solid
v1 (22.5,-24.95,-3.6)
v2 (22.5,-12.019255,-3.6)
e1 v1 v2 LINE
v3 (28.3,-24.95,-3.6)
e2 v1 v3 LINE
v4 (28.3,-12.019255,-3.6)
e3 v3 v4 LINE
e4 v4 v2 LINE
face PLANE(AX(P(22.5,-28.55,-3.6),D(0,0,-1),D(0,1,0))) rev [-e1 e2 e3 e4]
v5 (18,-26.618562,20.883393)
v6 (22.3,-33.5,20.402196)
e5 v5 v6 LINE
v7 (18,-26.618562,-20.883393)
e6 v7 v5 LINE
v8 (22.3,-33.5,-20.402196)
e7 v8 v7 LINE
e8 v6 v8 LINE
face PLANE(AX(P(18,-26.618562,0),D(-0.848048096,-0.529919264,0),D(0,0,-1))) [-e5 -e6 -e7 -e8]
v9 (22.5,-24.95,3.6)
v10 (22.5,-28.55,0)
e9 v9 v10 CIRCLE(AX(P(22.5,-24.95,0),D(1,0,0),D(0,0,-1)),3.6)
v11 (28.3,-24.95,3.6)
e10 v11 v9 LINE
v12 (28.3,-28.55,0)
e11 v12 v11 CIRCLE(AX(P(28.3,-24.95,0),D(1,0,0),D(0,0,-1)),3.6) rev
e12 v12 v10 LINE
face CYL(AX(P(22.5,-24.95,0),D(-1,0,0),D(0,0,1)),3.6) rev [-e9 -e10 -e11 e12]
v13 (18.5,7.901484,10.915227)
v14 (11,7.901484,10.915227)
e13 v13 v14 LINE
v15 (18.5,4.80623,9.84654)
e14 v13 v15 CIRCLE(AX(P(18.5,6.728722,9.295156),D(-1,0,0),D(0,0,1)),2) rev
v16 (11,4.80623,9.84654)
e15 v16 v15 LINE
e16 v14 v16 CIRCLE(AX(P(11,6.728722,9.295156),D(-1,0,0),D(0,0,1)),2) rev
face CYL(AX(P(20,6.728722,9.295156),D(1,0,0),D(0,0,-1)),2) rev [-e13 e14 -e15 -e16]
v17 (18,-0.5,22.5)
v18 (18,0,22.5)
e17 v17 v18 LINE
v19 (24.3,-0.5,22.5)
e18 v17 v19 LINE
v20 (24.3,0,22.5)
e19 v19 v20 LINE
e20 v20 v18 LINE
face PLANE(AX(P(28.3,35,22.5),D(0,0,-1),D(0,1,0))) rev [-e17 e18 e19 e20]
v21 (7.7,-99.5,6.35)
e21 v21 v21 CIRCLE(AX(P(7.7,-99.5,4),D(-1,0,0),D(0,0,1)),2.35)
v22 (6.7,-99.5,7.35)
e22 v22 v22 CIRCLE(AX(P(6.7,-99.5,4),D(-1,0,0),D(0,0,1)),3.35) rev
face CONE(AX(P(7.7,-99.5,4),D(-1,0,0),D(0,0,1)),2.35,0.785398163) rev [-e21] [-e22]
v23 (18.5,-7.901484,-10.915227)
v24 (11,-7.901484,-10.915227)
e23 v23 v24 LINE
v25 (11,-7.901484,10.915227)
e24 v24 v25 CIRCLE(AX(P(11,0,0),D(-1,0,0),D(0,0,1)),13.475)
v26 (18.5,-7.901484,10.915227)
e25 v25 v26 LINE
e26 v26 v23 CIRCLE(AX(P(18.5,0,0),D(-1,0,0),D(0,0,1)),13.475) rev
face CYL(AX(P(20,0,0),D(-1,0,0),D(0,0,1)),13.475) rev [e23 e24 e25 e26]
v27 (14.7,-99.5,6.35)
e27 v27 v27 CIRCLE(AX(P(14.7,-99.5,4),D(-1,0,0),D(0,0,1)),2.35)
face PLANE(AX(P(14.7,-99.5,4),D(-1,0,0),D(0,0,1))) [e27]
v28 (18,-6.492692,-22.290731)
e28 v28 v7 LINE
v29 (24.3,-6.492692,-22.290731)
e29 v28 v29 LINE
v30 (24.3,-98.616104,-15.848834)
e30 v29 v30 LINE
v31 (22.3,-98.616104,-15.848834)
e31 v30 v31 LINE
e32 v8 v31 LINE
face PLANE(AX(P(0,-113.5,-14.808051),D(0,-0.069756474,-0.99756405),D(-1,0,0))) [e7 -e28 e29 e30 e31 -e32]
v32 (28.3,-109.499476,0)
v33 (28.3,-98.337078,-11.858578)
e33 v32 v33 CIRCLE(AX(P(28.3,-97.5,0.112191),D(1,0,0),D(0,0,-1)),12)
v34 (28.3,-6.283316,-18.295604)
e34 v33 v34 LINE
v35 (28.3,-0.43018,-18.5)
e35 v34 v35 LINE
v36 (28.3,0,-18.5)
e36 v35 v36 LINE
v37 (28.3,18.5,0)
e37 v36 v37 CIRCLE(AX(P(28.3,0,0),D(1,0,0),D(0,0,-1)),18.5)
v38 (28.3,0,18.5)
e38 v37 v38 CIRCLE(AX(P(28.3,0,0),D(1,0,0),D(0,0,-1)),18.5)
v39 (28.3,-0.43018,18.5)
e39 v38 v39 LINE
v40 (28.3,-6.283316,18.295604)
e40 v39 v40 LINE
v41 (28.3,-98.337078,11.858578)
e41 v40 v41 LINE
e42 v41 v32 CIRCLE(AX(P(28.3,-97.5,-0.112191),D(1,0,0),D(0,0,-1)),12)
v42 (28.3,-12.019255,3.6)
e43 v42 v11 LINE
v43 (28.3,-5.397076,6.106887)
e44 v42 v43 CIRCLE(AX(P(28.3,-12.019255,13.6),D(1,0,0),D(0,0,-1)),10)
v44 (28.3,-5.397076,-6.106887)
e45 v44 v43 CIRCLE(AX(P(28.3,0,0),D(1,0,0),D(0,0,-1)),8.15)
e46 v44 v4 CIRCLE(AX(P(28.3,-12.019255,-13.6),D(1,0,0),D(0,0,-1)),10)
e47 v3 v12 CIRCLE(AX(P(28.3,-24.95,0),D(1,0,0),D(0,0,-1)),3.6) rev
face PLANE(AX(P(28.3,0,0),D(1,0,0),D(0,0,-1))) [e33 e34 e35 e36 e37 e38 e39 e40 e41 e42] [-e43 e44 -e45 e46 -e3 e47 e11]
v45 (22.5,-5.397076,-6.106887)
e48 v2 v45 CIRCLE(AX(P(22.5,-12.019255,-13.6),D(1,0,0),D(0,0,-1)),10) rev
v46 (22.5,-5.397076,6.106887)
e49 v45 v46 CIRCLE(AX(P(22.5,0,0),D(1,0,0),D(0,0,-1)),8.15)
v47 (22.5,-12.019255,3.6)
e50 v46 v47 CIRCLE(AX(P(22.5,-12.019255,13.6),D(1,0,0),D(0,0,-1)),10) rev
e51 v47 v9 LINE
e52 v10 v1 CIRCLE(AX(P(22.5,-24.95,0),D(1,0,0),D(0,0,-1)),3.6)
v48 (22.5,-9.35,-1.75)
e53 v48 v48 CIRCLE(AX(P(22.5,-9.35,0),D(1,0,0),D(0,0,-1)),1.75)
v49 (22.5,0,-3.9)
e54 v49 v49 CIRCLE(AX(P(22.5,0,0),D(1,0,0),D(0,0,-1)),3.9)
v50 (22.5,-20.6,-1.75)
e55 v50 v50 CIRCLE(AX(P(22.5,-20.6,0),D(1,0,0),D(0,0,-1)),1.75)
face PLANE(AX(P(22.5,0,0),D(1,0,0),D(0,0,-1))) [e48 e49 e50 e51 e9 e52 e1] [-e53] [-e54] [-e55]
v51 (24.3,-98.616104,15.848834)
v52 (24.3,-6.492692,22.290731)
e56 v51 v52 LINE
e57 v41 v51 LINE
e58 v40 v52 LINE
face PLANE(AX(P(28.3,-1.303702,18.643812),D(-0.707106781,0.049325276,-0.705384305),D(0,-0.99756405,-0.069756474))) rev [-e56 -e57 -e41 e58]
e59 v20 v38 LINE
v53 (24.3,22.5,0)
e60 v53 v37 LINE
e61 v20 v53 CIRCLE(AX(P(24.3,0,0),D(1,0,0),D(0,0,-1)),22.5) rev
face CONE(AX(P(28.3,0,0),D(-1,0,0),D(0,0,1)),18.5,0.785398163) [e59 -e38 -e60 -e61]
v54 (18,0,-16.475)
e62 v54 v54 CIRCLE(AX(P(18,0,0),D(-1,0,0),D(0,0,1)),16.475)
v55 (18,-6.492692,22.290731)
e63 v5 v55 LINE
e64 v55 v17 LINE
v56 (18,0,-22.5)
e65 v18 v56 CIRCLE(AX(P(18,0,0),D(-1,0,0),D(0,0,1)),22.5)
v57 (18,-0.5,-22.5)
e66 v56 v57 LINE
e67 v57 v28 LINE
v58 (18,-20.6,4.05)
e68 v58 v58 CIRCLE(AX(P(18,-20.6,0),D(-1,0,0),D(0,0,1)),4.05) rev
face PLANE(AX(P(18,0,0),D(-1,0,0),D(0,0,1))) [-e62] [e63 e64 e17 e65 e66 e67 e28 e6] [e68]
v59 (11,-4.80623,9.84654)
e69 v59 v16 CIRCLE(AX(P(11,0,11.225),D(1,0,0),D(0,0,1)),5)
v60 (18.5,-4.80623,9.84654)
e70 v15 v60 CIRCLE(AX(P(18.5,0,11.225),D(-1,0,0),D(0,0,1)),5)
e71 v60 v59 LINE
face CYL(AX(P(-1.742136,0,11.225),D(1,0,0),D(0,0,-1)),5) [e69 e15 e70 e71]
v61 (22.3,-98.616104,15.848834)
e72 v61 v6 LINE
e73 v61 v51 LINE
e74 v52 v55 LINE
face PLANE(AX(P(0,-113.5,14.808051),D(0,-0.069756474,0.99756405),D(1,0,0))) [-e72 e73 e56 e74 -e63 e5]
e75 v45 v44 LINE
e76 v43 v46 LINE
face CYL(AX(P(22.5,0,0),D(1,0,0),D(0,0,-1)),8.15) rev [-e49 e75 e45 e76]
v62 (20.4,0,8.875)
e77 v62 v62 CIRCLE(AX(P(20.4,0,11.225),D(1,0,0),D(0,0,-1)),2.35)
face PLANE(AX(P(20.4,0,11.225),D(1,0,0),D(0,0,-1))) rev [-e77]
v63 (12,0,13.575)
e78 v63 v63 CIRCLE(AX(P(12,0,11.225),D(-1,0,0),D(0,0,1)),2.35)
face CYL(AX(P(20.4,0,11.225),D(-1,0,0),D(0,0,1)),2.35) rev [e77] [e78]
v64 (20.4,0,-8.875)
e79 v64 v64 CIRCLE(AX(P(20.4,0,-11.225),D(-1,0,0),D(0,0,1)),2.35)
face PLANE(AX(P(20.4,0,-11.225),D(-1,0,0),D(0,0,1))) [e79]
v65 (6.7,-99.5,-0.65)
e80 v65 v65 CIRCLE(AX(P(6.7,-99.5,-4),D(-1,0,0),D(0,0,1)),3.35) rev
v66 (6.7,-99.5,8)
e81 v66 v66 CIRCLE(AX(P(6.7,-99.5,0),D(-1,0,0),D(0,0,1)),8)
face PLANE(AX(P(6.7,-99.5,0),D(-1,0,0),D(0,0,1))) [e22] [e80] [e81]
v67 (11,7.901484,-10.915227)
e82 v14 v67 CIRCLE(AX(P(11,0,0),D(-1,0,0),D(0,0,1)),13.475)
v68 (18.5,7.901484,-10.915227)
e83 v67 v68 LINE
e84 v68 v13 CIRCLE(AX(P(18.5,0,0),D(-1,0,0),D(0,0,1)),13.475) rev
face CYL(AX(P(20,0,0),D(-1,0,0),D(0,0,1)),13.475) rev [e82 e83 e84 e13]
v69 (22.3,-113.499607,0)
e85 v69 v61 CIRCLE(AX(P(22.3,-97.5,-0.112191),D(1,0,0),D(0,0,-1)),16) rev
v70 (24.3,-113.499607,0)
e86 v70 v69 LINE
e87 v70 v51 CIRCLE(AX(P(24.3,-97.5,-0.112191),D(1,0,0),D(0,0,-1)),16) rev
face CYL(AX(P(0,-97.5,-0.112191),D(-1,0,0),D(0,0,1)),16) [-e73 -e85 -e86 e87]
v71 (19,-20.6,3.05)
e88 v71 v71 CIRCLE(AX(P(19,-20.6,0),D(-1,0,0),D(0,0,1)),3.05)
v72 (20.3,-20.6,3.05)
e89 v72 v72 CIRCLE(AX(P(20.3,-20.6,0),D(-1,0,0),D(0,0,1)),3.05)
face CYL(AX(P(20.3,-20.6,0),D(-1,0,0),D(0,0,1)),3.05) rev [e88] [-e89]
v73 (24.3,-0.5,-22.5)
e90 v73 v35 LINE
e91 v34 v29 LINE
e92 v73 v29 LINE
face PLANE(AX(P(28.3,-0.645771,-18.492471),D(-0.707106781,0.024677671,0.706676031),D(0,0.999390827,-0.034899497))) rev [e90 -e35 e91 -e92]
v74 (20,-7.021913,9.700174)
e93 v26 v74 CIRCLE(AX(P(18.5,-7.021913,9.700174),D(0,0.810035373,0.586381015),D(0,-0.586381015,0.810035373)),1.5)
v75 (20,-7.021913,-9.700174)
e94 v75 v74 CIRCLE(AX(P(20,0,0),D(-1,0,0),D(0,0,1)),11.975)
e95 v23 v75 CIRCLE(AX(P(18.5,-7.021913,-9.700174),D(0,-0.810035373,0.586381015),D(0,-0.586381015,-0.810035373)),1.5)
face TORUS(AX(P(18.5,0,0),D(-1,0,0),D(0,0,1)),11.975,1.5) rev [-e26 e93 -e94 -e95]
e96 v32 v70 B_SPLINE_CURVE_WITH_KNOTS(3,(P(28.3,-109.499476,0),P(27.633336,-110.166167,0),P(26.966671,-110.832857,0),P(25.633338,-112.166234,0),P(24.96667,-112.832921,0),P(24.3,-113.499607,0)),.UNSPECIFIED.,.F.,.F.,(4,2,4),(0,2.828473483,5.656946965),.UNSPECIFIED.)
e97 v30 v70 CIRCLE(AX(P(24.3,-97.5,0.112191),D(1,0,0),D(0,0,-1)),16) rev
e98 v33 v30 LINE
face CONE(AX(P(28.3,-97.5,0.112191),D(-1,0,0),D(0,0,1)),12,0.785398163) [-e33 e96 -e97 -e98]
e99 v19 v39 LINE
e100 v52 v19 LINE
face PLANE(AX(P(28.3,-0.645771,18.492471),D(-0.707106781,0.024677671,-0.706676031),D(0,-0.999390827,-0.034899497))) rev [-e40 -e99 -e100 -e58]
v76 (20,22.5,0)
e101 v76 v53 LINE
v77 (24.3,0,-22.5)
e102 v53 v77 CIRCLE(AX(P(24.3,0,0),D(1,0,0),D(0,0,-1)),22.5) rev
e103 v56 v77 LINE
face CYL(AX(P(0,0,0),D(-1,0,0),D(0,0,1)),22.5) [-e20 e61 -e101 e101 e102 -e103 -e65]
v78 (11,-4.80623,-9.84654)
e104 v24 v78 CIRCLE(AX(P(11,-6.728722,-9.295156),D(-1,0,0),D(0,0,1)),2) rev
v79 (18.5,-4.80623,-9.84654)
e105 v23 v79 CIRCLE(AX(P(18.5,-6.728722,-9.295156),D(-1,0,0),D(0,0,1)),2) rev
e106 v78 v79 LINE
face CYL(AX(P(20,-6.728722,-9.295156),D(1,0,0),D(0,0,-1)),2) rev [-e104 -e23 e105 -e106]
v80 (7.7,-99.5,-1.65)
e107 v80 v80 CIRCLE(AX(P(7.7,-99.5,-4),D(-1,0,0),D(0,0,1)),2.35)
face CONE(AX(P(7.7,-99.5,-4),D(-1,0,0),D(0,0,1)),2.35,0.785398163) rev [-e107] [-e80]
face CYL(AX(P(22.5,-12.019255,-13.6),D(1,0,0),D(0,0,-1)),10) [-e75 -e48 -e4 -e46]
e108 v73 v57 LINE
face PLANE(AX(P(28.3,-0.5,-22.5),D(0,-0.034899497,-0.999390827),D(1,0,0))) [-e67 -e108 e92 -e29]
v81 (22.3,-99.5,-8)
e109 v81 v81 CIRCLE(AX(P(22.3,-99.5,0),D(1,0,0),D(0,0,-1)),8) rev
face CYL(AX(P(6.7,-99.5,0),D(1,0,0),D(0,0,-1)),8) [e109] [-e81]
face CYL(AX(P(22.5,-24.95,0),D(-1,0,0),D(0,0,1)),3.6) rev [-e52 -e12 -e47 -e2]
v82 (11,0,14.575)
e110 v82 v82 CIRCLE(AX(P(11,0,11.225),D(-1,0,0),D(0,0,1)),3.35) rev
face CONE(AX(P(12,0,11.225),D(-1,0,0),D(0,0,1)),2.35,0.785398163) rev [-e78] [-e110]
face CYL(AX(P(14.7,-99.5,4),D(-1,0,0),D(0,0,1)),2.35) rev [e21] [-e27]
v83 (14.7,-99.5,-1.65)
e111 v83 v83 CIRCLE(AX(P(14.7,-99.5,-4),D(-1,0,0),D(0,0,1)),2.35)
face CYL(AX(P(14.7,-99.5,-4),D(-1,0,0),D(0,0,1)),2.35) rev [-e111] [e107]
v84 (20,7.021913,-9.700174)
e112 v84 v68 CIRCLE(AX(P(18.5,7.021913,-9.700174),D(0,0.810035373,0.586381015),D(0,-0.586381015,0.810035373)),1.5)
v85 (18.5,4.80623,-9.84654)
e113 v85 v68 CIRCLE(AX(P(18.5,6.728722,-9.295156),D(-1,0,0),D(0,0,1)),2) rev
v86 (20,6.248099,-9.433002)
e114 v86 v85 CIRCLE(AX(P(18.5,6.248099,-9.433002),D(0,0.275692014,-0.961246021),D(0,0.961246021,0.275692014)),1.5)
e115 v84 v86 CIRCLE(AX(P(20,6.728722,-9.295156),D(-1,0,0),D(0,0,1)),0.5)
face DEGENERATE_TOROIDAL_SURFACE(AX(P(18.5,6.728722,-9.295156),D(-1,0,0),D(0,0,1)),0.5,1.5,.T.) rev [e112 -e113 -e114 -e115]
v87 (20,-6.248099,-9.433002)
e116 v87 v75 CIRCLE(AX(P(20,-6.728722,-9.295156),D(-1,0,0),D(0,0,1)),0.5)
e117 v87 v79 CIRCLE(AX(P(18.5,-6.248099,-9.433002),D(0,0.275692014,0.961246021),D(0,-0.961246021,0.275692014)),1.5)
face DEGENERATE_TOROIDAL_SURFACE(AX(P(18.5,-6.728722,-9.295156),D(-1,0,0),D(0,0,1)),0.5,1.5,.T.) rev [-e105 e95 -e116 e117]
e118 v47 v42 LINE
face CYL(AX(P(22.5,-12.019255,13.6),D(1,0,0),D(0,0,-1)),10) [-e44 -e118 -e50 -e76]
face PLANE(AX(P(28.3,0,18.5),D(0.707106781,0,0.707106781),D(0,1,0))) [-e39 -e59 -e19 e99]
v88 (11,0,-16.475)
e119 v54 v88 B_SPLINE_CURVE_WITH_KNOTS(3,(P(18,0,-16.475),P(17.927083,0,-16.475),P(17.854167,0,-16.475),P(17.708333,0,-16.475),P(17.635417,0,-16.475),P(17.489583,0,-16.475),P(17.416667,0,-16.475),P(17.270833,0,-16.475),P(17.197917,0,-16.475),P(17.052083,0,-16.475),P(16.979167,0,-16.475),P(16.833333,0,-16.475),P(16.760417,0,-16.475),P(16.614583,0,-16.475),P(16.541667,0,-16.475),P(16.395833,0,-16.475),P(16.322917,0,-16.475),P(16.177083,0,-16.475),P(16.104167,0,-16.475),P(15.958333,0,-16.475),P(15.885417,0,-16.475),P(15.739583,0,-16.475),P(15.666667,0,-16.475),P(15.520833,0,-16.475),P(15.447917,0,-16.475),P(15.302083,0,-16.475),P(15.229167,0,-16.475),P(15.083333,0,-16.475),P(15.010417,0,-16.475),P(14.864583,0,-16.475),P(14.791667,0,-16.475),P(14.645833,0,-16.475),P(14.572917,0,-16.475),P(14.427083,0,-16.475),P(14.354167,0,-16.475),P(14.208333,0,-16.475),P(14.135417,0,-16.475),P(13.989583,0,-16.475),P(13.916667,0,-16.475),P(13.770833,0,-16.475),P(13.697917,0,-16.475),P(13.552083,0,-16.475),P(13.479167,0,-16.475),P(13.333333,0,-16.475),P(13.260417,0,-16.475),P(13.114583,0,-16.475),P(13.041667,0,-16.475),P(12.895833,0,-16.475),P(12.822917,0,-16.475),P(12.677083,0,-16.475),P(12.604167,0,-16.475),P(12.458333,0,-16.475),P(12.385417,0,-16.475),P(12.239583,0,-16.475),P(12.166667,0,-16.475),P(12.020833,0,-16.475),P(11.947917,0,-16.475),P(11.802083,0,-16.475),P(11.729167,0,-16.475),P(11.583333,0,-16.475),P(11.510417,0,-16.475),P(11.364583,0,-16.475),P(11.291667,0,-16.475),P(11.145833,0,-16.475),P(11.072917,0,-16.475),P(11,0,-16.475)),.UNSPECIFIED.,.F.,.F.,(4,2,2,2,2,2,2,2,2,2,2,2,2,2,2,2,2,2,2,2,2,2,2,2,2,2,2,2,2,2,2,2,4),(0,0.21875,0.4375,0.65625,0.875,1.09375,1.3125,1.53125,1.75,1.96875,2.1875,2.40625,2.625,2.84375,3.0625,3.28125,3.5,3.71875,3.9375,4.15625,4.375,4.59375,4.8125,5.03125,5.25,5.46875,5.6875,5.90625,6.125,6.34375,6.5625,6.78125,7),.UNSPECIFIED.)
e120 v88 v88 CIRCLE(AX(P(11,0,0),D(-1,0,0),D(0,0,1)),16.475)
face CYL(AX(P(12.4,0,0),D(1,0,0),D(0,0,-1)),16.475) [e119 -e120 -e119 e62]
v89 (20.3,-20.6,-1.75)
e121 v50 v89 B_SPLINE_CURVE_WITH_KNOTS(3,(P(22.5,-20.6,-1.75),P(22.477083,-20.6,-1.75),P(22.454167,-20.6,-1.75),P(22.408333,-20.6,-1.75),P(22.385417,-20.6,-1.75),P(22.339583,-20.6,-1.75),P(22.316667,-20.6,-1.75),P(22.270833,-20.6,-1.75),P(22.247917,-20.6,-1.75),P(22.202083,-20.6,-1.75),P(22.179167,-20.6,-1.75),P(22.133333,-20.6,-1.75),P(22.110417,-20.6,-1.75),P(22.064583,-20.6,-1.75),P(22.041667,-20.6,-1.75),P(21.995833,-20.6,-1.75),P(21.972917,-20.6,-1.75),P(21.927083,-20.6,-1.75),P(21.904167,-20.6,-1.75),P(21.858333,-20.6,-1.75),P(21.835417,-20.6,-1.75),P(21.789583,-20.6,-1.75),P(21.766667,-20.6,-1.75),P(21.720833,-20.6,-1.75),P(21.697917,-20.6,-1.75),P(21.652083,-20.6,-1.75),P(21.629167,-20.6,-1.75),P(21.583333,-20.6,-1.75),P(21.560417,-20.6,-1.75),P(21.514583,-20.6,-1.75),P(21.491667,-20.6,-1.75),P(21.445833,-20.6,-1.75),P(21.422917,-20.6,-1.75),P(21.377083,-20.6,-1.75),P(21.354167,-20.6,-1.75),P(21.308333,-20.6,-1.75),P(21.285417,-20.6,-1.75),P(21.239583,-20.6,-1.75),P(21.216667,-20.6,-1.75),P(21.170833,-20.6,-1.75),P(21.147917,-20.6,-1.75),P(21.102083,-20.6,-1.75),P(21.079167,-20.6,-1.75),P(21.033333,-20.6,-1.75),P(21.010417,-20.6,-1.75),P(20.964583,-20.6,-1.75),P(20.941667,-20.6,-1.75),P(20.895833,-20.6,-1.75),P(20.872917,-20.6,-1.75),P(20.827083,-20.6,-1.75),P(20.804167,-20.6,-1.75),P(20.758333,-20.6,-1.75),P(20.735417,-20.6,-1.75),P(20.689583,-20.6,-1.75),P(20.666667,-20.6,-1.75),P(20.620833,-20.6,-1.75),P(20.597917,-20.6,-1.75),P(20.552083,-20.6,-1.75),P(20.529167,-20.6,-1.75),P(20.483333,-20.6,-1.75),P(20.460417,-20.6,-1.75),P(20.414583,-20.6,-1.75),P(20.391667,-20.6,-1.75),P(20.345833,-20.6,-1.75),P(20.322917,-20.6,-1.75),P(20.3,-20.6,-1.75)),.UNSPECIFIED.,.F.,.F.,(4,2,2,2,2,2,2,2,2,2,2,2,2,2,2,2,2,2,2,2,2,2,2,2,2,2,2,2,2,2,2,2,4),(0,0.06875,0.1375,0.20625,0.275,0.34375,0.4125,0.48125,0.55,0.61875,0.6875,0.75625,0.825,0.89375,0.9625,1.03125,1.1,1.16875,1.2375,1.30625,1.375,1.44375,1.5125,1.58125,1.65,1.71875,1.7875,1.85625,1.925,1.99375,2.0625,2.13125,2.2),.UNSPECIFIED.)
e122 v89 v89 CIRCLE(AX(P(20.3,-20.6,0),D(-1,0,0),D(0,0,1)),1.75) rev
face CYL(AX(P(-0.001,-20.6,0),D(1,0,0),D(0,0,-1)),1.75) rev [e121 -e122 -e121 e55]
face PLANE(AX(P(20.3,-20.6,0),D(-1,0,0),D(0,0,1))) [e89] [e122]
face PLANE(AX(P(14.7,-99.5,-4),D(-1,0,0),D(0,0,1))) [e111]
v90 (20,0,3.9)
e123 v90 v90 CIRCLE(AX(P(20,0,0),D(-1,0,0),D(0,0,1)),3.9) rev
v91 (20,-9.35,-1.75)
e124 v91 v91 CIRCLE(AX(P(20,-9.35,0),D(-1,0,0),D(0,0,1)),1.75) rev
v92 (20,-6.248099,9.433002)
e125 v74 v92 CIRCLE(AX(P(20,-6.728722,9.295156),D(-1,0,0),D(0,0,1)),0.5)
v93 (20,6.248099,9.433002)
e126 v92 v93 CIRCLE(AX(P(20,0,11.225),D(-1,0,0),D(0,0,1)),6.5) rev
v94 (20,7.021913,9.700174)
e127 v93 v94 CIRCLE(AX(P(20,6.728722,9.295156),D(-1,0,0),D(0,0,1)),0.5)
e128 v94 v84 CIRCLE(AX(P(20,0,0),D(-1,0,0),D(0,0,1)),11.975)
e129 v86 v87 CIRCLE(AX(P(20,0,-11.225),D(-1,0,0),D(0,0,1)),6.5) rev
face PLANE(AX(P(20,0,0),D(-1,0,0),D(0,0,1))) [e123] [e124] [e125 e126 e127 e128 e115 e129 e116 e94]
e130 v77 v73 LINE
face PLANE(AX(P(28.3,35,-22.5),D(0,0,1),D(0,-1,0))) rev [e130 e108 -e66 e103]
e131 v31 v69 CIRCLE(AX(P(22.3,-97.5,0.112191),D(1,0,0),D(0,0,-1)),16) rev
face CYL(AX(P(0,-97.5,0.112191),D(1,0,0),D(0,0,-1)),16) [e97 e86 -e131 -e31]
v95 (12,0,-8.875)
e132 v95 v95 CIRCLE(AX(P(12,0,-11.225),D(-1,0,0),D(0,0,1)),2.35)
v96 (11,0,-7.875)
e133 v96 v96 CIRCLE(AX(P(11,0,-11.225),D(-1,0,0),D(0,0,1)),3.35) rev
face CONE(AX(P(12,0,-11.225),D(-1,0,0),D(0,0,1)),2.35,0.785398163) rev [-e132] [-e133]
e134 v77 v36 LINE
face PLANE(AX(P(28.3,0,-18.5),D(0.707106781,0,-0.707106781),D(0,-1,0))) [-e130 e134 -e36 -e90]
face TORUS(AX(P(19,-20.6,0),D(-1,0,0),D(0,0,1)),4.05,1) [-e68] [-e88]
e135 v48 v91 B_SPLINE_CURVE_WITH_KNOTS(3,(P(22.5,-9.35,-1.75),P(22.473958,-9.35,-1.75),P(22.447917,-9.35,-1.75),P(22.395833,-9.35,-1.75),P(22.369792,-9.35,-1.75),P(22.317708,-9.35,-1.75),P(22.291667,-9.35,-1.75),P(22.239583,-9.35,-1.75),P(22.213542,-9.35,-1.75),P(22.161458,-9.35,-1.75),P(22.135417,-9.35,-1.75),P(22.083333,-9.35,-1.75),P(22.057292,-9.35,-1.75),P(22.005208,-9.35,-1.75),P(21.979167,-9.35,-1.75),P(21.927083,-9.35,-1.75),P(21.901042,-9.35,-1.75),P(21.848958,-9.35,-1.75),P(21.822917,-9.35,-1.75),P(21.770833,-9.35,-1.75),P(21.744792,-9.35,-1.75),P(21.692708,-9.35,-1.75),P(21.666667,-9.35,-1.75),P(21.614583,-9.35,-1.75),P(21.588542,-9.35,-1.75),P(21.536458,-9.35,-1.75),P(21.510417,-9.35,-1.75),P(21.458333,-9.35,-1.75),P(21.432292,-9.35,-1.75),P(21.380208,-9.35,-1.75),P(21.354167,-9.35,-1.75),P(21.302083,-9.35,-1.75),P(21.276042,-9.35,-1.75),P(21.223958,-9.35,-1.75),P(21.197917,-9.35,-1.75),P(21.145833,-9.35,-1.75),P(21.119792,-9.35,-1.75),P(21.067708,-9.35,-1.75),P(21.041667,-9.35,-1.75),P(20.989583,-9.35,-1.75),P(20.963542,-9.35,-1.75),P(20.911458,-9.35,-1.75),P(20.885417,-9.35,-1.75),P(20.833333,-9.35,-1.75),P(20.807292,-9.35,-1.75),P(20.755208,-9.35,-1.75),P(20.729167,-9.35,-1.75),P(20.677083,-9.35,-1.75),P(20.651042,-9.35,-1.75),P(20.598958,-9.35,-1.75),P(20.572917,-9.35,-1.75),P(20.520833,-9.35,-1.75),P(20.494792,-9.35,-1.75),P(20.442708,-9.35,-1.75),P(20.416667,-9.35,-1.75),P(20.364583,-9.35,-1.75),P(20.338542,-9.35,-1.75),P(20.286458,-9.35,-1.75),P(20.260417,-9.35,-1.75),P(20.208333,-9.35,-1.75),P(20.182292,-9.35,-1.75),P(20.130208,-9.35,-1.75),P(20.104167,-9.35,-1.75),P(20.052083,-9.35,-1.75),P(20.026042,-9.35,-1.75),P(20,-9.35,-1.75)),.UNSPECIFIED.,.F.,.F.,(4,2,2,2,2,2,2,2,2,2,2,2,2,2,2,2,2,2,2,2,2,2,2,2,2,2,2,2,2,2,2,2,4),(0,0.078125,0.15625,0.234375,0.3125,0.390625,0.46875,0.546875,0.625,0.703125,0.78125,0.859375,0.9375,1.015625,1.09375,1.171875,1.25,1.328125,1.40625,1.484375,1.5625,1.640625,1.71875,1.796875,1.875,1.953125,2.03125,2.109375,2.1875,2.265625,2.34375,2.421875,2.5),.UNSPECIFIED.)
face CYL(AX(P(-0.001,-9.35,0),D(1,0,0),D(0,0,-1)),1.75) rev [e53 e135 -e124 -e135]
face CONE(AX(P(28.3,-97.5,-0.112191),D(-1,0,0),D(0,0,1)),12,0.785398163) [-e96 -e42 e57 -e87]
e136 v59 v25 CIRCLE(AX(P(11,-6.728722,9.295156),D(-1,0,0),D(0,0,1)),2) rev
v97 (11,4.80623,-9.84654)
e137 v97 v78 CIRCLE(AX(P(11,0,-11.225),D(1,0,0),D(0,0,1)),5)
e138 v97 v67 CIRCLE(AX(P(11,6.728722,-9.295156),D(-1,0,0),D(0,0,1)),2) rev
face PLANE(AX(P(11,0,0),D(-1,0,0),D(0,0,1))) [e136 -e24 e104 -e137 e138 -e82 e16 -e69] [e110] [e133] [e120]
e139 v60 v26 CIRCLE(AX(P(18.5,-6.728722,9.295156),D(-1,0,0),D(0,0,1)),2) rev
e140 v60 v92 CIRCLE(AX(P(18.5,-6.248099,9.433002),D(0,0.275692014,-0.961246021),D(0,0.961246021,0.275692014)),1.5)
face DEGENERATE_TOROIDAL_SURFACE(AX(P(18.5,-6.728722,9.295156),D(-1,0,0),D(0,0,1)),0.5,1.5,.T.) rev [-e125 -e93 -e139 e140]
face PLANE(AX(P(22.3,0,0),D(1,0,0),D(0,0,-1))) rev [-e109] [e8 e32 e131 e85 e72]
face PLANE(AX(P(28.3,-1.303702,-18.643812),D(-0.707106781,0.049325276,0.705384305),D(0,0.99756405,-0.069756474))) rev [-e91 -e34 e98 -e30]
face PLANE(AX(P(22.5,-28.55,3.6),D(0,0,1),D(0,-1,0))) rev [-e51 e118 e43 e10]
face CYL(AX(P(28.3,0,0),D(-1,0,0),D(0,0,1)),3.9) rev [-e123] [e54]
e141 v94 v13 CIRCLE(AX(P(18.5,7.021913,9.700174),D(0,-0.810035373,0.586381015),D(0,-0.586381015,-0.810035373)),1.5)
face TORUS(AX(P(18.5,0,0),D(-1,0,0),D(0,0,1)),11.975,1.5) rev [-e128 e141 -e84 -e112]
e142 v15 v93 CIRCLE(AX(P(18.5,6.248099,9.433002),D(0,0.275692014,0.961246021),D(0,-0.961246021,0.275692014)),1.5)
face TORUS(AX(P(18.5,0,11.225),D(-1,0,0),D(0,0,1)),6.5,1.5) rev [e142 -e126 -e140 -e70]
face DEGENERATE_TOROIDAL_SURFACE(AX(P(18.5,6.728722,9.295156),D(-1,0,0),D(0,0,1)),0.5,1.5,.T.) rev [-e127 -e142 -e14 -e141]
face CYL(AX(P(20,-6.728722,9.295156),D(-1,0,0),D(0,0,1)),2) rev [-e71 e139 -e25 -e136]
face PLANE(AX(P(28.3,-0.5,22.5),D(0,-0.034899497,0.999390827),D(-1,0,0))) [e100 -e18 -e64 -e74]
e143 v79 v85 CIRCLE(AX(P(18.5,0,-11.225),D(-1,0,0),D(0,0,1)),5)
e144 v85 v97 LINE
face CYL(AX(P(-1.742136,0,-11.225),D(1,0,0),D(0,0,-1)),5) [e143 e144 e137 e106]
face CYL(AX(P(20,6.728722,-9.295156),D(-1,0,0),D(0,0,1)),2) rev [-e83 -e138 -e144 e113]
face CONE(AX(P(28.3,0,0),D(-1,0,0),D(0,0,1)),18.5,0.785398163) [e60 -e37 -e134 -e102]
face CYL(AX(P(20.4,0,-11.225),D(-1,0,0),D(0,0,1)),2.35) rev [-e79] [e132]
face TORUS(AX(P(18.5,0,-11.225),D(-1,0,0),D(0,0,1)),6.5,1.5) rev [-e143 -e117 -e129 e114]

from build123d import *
from OCP.BRepFilletAPI import BRepFilletAPI_MakeChamfer

# Parameters (mm, degrees)
SKETCH1_W           = 20
SKETCH1_H           = 20
BOSS_EXTRUDE1_DEPTH = 20
SKETCH2_W           = 45
SKETCH2_H           = 70
BOSS_EXTRUDE2_DEPTH = 8.3
CUT_EXTRUDE1_DEPTH  = 5.8
FILLET1_R           = 3.6
FILLET2_R           = 10
SKETCH5_R           = 3.9
CUT_EXTRUDE2_DEPTH  = 51.320373608
CUT_EXTRUDE3_REACH  = 49.302
SKETCH6_R           = 1.75
SKETCH13_W          = 20
SKETCH13_H          = 20
CUT_EXTRUDE9_DEPTH  = 20
SKETCH14_R          = 16.475
BOSS_EXTRUDE3_DEPTH = 7.6
SKETCH15_W          = 8.3
SKETCH15_H          = 45
CUT_EXTRUDE10_DEPTH = 12.5
SKETCH16_R          = 13.475
CUT_EXTRUDE11_DEPTH = 7.6
SKETCH18_W          = 8.3
SKETCH18_H          = 45
BOSS_EXTRUDE4_DEPTH = 78.5
FILLET5_R           = 22.5
SKETCH20_W          = 45
SKETCH20_H          = 80
CUT_EXTRUDE12_DEPTH = 2.3
SKETCH21_R          = 8
BOSS_EXTRUDE5_DEPTH = 15.6
CHAMFER2_SIZE       = 110
CHAMFER2_SIZE2      = 7.691949314
CHAMFER3_SIZE       = 3
FILLET6_R           = 16
CHAMFER4_SIZE       = 4
SKETCH23_R          = 2.35
CUT_EXTRUDE13_DEPTH = 8
CHAMFER5_SIZE       = 1
SKETCH24_R          = 5
BOSS_EXTRUDE6_DEPTH = 7.6
SKETCH27_R          = 2.35
CUT_EXTRUDE14_DEPTH = 8
SKETCH28_R          = 16.475
SKETCH28_R_2        = 1.75
BOSS_EXTRUDE7_DEPTH = 2
BOSS_EXTRUDE8_START = 1.4
SKETCH30_R          = 16.475
SKETCH30_R_2        = 2.35
BOSS_EXTRUDE8_DEPTH = 1.4
FILLET7_R           = 2
FILLET8_R           = 1.5
CHAMFER6_SIZE       = 1
SKETCH31_R          = 3.05
CUT_EXTRUDE15_DEPTH = 2.3
FILLET9_R           = 1
CHAMFER7_SIZE2      = 4.3
CHAMFER7_SIZE       = 6.881438475


# Some blends are built 0.0001 mm under size
with BuildPart() as part:
    # Sketch1 → Boss-Extrude1 (new body)
    with BuildSketch(Plane(origin=(0, 0, 0), x_dir=(0, 0, -1), z_dir=(1, 0, 0))):
        Rectangle(SKETCH1_W, SKETCH1_H)
    extrude(amount=BOSS_EXTRUDE1_DEPTH)

    # Sketch2 → Boss-Extrude2 (add)
    with BuildSketch(Plane(origin=(20, 0, 0), x_dir=(0, 0, -1), z_dir=(1, 0, 0))):
        Rectangle(SKETCH2_W, SKETCH2_H)
    extrude(amount=BOSS_EXTRUDE2_DEPTH)

    # Sketch4 → Cut-Extrude1 (cut)
    with BuildSketch(Plane(origin=(28.3, 0, 0), x_dir=(0, 0, -1), z_dir=(1, 0, 0))):
        with BuildLine():
            Line((3.6, -28.55), (-3.6, -28.55))
            Line((-3.6, -28.55), (-3.6, -7.311805523))
            ThreePointArc((-3.6, -7.311805523), (0, 8.15), (3.6, -7.311805523))
            Line((3.6, -7.311805523), (3.6, -28.55))
        make_face()
    extrude(amount=-CUT_EXTRUDE1_DEPTH, mode=Mode.SUBTRACT)

    # Fillet1
    fillet1_edges = [part.edges().sort_by_distance(p)[0] for p in [
        (25.4, -28.55, 3.6),
        (25.4, -28.55, -3.6),
    ]]
    fillet(fillet1_edges, radius=FILLET1_R - 0.0001)  # a hair under: the kernel refuses the full size

    # Fillet2
    fillet2_edges = [part.edges().sort_by_distance(p)[0] for p in [
        (25.4, -7.311805523, 3.6),
        (25.4, -7.311805523, -3.6),
    ]]
    fillet(fillet2_edges, radius=FILLET2_R)

    # Sketch5 → Cut-Extrude2 (cut, through all)
    with BuildSketch(Plane.ZY):
        Circle(SKETCH5_R)
    extrude(amount=-CUT_EXTRUDE2_DEPTH, mode=Mode.SUBTRACT)

    # Sketch6 → Cut-Extrude3 (cut, up to next)
    with BuildSketch(Plane(origin=(22.5, 0, 0), x_dir=(0, 0, -1), z_dir=(1, 0, 0)), mode=Mode.PRIVATE) as cut_extrude3_sk1:
        with Locations((0, -20.6)):
            Circle(SKETCH6_R)
    cut_extrude3_tool1 = extrude(cut_extrude3_sk1.sketch, amount=-CUT_EXTRUDE3_REACH, mode=Mode.PRIVATE) & part.part
    # Sketch6 → Cut-Extrude3 (cut, up to next)
    with BuildSketch(Plane(origin=(22.5, 0, 0), x_dir=(0, 0, -1), z_dir=(1, 0, 0)), mode=Mode.PRIVATE) as cut_extrude3_sk2:
        with Locations((0, -9.35)):
            Circle(SKETCH6_R)
    cut_extrude3_tool2 = extrude(cut_extrude3_sk2.sketch, amount=-CUT_EXTRUDE3_REACH, mode=Mode.PRIVATE) & part.part
    add(cut_extrude3_tool1.solids().sort_by_distance((22.5, -20.6, 0))[0], mode=Mode.SUBTRACT)
    add(cut_extrude3_tool2.solids().sort_by_distance((22.5, -9.35, 0))[0], mode=Mode.SUBTRACT)

    # Sketch13 → Cut-Extrude9 (cut)
    with BuildSketch(Plane.ZY):
        Rectangle(SKETCH13_W, SKETCH13_H)
    extrude(amount=-CUT_EXTRUDE9_DEPTH, mode=Mode.SUBTRACT)

    # Sketch14 → Boss-Extrude3 (add)
    with BuildSketch(Plane.ZY.offset(-20)):
        with Locations(Location((0, 0, 0), (0, 0, 180))):
            Circle(SKETCH14_R)
    extrude(amount=BOSS_EXTRUDE3_DEPTH)

    # Sketch15 → Cut-Extrude10 (cut)
    with BuildSketch(Plane(origin=(0, 35, 0), x_dir=(1, 0, 0), z_dir=(0, 1, 0))):
        with Locations((24.15, 0)):
            Rectangle(SKETCH15_W, SKETCH15_H)
    extrude(amount=-CUT_EXTRUDE10_DEPTH, mode=Mode.SUBTRACT)

    # Sketch16 → Cut-Extrude11 (cut)
    with BuildSketch(Plane.ZY.offset(-12.4)):
        Circle(SKETCH16_R)
    extrude(amount=-CUT_EXTRUDE11_DEPTH, mode=Mode.SUBTRACT)

    # Sketch18 → Boss-Extrude4 (add)
    with BuildSketch(Plane.XZ.offset(35)):
        with Locations((24.15, 0)):
            Rectangle(SKETCH18_W, SKETCH18_H)
    extrude(amount=BOSS_EXTRUDE4_DEPTH)

    # Fillet5
    fillet5_edges = [part.edges().sort_by_distance(p)[0] for p in [
        (24.15, 22.5, -22.5),
        (24.15, 22.5, 22.5),
    ]]
    fillet(fillet5_edges, radius=FILLET5_R - 0.0001)  # a hair under: the kernel refuses the full size

    # Sketch20 → Cut-Extrude12 (cut)
    with BuildSketch(Plane.ZY.offset(-20)):
        with Locations((0, -73.5)):
            Rectangle(SKETCH20_W, SKETCH20_H)
    extrude(amount=-CUT_EXTRUDE12_DEPTH, mode=Mode.SUBTRACT)

    # Sketch21 → Boss-Extrude5 (add)
    with BuildSketch(Plane.ZY.offset(-22.3)):
        with Locations(Location((0, -99.5, 0), (0, 0, 180))):
            Circle(SKETCH21_R)
    extrude(amount=BOSS_EXTRUDE5_DEPTH)

    # Chamfer2: one chamfer whose edges measure the first distance from different faces: ONE call of the kernel's chamfer builder (chamfer() names one face for all edges)
    chamfer2_edges_1 = [part.edges().sort_by_distance(p)[0] for p in [
        (25.3, -113.5, -22.5),
    ]]
    chamfer2_side_1 = [part.faces().sort_by_distance(p)[0] for p in [
        (24.878183359, -52.68424744, -22.5),
    ]]
    chamfer2_edges_2 = [part.edges().sort_by_distance(p)[0] for p in [
        (25.3, -113.5, 22.5),
    ]]
    chamfer2_side_2 = [part.faces().sort_by_distance(p)[0] for p in [
        (24.878183359, -52.68424744, 22.5),
    ]]
    chamfer2 = BRepFilletAPI_MakeChamfer(part.part.solid().wrapped)
    for e in chamfer2_edges_1:
        chamfer2.Add(CHAMFER2_SIZE, CHAMFER2_SIZE2, e.wrapped, chamfer2_side_1[0].wrapped)  # the first distance lies on this face
    for e in chamfer2_edges_2:
        chamfer2.Add(CHAMFER2_SIZE, CHAMFER2_SIZE2, e.wrapped, chamfer2_side_2[0].wrapped)  # the first distance lies on this face
    add(Compound.cast(chamfer2.Shape()), mode=Mode.REPLACE)

    # Chamfer3
    # the kernel refuses this chamfer: 3 mm, written as the material it takes off along each edge
    with BuildSketch(Plane(origin=(36.099824275, -3.5, -22.5), x_dir=(0, -0.9976567869548854, 0.06841736214481542), z_dir=(-1, 0, 0))) as chamfer3_piece_1:
        Polygon((CHAMFER3_SIZE * 0.99999909909, CHAMFER3_SIZE * 0.00134231857559), (-CHAMFER3_SIZE * 0.997656786955, CHAMFER3_SIZE * 0.0684173621448), (0, 0), align=None)
    extrude(amount=23.89964855, mode=Mode.SUBTRACT)
    with BuildSketch(Plane(origin=(12.200175725, -3.5, 22.5), x_dir=(0, 0.999999099090015, 0.0013423185755924486), z_dir=(1, 0, 0))) as chamfer3_piece_2:
        Polygon((CHAMFER3_SIZE * 0.99999909909, -CHAMFER3_SIZE * 0.00134231857559), (-CHAMFER3_SIZE * 0.997656786955, -CHAMFER3_SIZE * 0.0684173621448), (0, 0), align=None)
    extrude(amount=23.89964855, mode=Mode.SUBTRACT)

    # Fillet6
    # the kernel refuses this fillet: 16 mm, written as the material it takes off along each edge
    with BuildSketch(Plane(origin=(65.600603446, -113.5, -14.808050686), x_dir=(0, 0, 1), z_dir=(-1, 0, 0))) as fillet6_piece_1:
        with BuildLine():
            CenterArc((FILLET6_R * 0.932515086138, FILLET6_R), FILLET6_R, 184, 86)
            Line((-FILLET6_R * 0.0650489641222, FILLET6_R * 0.930243526256), (0, 0))
            Line((0, 0), (FILLET6_R * 0.932515086138, 0))
        make_face()
    extrude(amount=80.601206891, mode=Mode.SUBTRACT)
    with BuildSketch(Plane(origin=(-15.000603446, -113.5, 14.808050686), x_dir=(0, 0.9975640502598242, 0.06975647374412544), z_dir=(1, 0, 0))) as fillet6_piece_2:
        with BuildLine():
            CenterArc((FILLET6_R * 0.932515086138, -FILLET6_R), FILLET6_R, 90, 86)
            Line((-FILLET6_R * 0.0650489641222, -FILLET6_R * 0.930243526256), (0, 0))
            Line((0, 0), (FILLET6_R * 0.932515086138, 0))
        make_face()
    extrude(amount=80.601206891, mode=Mode.SUBTRACT)

    # Chamfer4
    # the kernel refuses this chamfer: 4 mm, written as the material it takes off along each edge
    with BuildSketch(Plane(origin=(28.3, 0.0001, 22.5), x_dir=(0.02749587661058735, 0, -0.9996219169112968), z_dir=(0, -1, 0)), Plane(origin=(28.3, -10.786731952, -22.5), x_dir=(0.027495876610586487, 0, 0.9996219169112968), z_dir=(0, 1, 0))) as chamfer4_piece_1:
        Polygon((CHAMFER4_SIZE * 0.999621916911, -CHAMFER4_SIZE * 0.0274958766106), (-CHAMFER4_SIZE * 0.0274958766106, -CHAMFER4_SIZE * 0.999621916911), (0, 0), align=None)
    extrude(amount=10.786831952, mode=Mode.SUBTRACT)
    with BuildSketch(Plane(origin=(28.3, 0.0001, 0.0001), x_dir=(0, 1, 0), z_dir=(0, 0, -1))) as chamfer4_piece_2:
        Polygon((22.4999 - CHAMFER4_SIZE, 0), (22.4999, -CHAMFER4_SIZE), (22.4999, 0), align=None)
    revolve(axis=Axis((28.3, 0.0001, 0.0001), (1, 0, 0)), revolution_arc=90, mode=Mode.SUBTRACT)
    with BuildSketch(Plane(origin=(28.3, 0.0001, -0.0001), x_dir=(0, 0, -1), z_dir=(0, -1, 0))) as chamfer4_piece_3:
        Polygon((22.4999 - CHAMFER4_SIZE, 0), (22.4999, -CHAMFER4_SIZE), (22.4999, 0), align=None)
    revolve(axis=Axis((28.3, 0.0001, -0.0001), (1, 0, 0)), revolution_arc=90, mode=Mode.SUBTRACT)
    with BuildSketch(Plane(origin=(28.3, 3.768981839, 23.008296726), x_dir=(0.027495876610586473, 0.06973010000107531, -0.9971868881625227), z_dir=(0, -0.9975640502598243, -0.06975647374412554))) as chamfer4_piece_4:
        Polygon((CHAMFER4_SIZE * 0.999621916911, -CHAMFER4_SIZE * 0.0274958766106), (-CHAMFER4_SIZE * 0.0274958766106, -CHAMFER4_SIZE * 0.999621916911), (0, 0), align=None)
    extrude(amount=102.635099363, mode=Mode.SUBTRACT)
    with BuildSketch(Plane(origin=(28.3, 9.780465553, -22.859001768), x_dir=(0.027495876610586487, 0.03488630179317817, 0.9990129742483882), z_dir=(0, -0.9993908270190893, 0.03489949670268572))) as chamfer4_piece_5:
        Polygon((CHAMFER4_SIZE * 0.999621916911, CHAMFER4_SIZE * 0.0274958766106), (-CHAMFER4_SIZE * 0.0274958766106, CHAMFER4_SIZE * 0.999621916911), (0, 0), align=None)
    extrude(amount=26.569808866, mode=Mode.SUBTRACT)
    with BuildSketch(Plane(origin=(28.3, 9.780465553, 22.859001768), x_dir=(0.027495876610586494, 0.034886301793392936, -0.9990129742483806), z_dir=(0, -0.9993908270190818, -0.03489949670290056))) as chamfer4_piece_6:
        Polygon((CHAMFER4_SIZE * 0.999621916911, -CHAMFER4_SIZE * 0.0274958766106), (-CHAMFER4_SIZE * 0.0274958766106, -CHAMFER4_SIZE * 0.999621916911), (0, 0), align=None)
    extrude(amount=26.569808866, mode=Mode.SUBTRACT)
    with BuildSketch(Plane(origin=(28.3, 3.768981839, -23.008296726), x_dir=(0.027495876610586473, 0.06973010000107512, 0.9971868881625227), z_dir=(0, -0.9975640502598243, 0.06975647374412534))) as chamfer4_piece_7:
        Polygon((CHAMFER4_SIZE * 0.999621916911, CHAMFER4_SIZE * 0.0274958766106), (-CHAMFER4_SIZE * 0.0274958766106, CHAMFER4_SIZE * 0.999621916911), (0, 0), align=None)
    extrude(amount=102.635099363, mode=Mode.SUBTRACT)
    with BuildSketch(Plane(origin=(28.3, -97.5, -0.112190692), x_dir=(0, -0.9999754161991546, 0.007011918234514749), z_dir=(0, -0.007011918234514749, -0.9999754161991546))) as chamfer4_piece_8:
        Polygon((16 - CHAMFER4_SIZE, 0), (16, CHAMFER4_SIZE), (16, 0), align=None)
    revolve(axis=Axis((28.3, -97.5, -0.112190692), (-1, 0, 0)), revolution_arc=85.598243387, mode=Mode.SUBTRACT)
    with BuildSketch(Plane(origin=(28.3, -97.5, 0.112190692), x_dir=(0, -0.9999754161989443, -0.0070119182645099615), z_dir=(0, -0.0070119182645099615, 0.9999754161989443))) as chamfer4_piece_9:
        Polygon((16 - CHAMFER4_SIZE, 0), (16, -CHAMFER4_SIZE), (16, 0), align=None)
    revolve(axis=Axis((28.3, -97.5, 0.112190692), (1, 0, 0)), revolution_arc=85.598243385, mode=Mode.SUBTRACT)
    with BuildSketch(Plane(origin=(28.3, 22.5, -0.0001), x_dir=(0.027495876610588214, -0.9996219169112968, 0), z_dir=(0, 0, 1))) as chamfer4_piece_10:
        Polygon((CHAMFER4_SIZE * 0.999621916911, -CHAMFER4_SIZE * 0.0274958766106), (-CHAMFER4_SIZE * 0.0274958766106, -CHAMFER4_SIZE * 0.999621916911), (0, 0), align=None)
    extrude(amount=0.0002, mode=Mode.SUBTRACT)

    # Sketch23 → Cut-Extrude13 (cut)
    with BuildSketch(Plane.ZY.offset(-6.7)):
        with Locations((-4, -99.5)):
            Circle(SKETCH23_R)
        with Locations((4, -99.5)):
            Circle(SKETCH23_R)
    extrude(amount=-CUT_EXTRUDE13_DEPTH, mode=Mode.SUBTRACT)

    # Chamfer5
    chamfer5_edges = [part.edges().sort_by_distance(p)[0] for p in [
        (6.7, -99.5, 1.65),
        (6.7, -99.5, -6.35),
    ]]
    chamfer(chamfer5_edges, length=CHAMFER5_SIZE)

    # Sketch24 → Boss-Extrude6 (add)
    with BuildSketch(Plane.ZY.offset(-20)):
        with Locations((-11.225, 0)):
            Circle(SKETCH24_R)
        with Locations((11.225, 0)):
            Circle(SKETCH24_R)
    extrude(amount=BOSS_EXTRUDE6_DEPTH)

    # Sketch27 → Cut-Extrude14 (cut)
    with BuildSketch(Plane.ZY.offset(-12.4)):
        with Locations((-11.225, 0)):
            Circle(SKETCH27_R)
        with Locations(Location((11.225, 0, 0), (0, 0, 180))):
            Circle(SKETCH27_R)
    extrude(amount=-CUT_EXTRUDE14_DEPTH, mode=Mode.SUBTRACT)

    # Sketch28 → Boss-Extrude7 (add)
    with BuildSketch(Plane.ZY.offset(-20)):
        with BuildLine():
            Line((20.402195642, -33.5), (22.290730579, -6.492692151))
            Line((22.290730579, -6.492692151), (22.5, -0.5))
            Line((22.5, -0.5), (22.5, 0))
            ThreePointArc((22.5, 0), (15.909902577, 15.909902577), (0, 22.5))
            ThreePointArc((0, 22.5), (-15.909902577, 15.909902577), (-22.5, 0))
            Line((-22.5, 0), (-22.5, -0.5))
            Line((-22.5, -0.5), (-22.290730579, -6.492692151))
            Line((-22.290730579, -6.492692151), (-20.402195642, -33.5))
            Line((-20.402195642, -33.5), (20.402195642, -33.5))
        make_face()
        with Locations(Location((0, 0, 0), (0, 0, 180))):
            Circle(SKETCH28_R, mode=Mode.SUBTRACT)
        with Locations(Location((0, -20.6, 0), (0, 0, 180))):
            Circle(SKETCH28_R_2, mode=Mode.SUBTRACT)
    extrude(amount=BOSS_EXTRUDE7_DEPTH)

    # Sketch30 → Boss-Extrude8 (add)
    with BuildSketch(Plane.ZY.offset(-12.4).offset(BOSS_EXTRUDE8_START)):
        with Locations(Location((0, 0, 0), (0, 0, 180))):
            Circle(SKETCH30_R)
        with Locations((-11.225, 0)):
            Circle(SKETCH30_R_2, mode=Mode.SUBTRACT)
        with Locations((11.225, 0)):
            Circle(SKETCH30_R_2, mode=Mode.SUBTRACT)
        with BuildLine():
            ThreePointArc((12.586915367, 4.810944453), (0, 13.475), (-12.586915367, 4.810944453))
            ThreePointArc((-12.586915367, 4.810944453), (-6.225, 0), (-12.586915367, -4.810944453))
            ThreePointArc((-12.586915367, -4.810944453), (0, -13.475), (12.586915367, -4.810944453))
            ThreePointArc((12.586915367, -4.810944453), (6.225, 0), (12.586915367, 4.810944453))
        make_face(mode=Mode.SUBTRACT)
    extrude(amount=-BOSS_EXTRUDE8_DEPTH)

    # Fillet7
    fillet7_edges = [part.edges().sort_by_distance(p)[0] for p in [
        (16.2, -4.810944453, 12.586915367),
        (16.2, 4.810944453, 12.586915367),
        (15.5, 4.810944453, -12.586915367),
        (15.5, -4.810944453, -12.586915367),
    ]]
    fillet(fillet7_edges, radius=FILLET7_R)

    # Fillet8
    fillet8_edges = [part.edges().sort_by_distance(p)[0] for p in [
        (20, 0, 6.225),
        (20, -13.475, 0),
        (20, 13.475, 0),
        (20, 0, -6.225),
        (20, -6.075999698, -11.185646156),
        (20, 6.075999698, -11.185646156),
        (20, 6.075999698, 11.185646156),
        (20, -6.075999698, 11.185646156),
    ]]
    fillet(fillet8_edges, radius=FILLET8_R)

    # Chamfer6
    chamfer6_edges = [part.edges().sort_by_distance(p)[0] for p in [
        (11, 0, -13.575),
        (11, 0, 8.875),
    ]]
    chamfer(chamfer6_edges, length=CHAMFER6_SIZE)

    # Sketch31 → Cut-Extrude15 (cut)
    with BuildSketch(Plane.ZY.offset(-18)):
        with Locations((0, -20.6)):
            Circle(SKETCH31_R)
    extrude(amount=-CUT_EXTRUDE15_DEPTH, mode=Mode.SUBTRACT)

    # Fillet9
    fillet9_edges = [part.edges().sort_by_distance(p)[0] for p in [
        (18, -20.6, -3.05),
    ]]
    fillet(fillet9_edges, radius=FILLET9_R)

    # Chamfer7
    chamfer7_edges = [part.edges().sort_by_distance(p)[0] for p in [
        (18, -33.5, 0),
    ]]
    chamfer7_side = [part.faces().sort_by_distance(p)[0] for p in [
        (18, -33.414, 0),
    ]]
    chamfer(chamfer7_edges, length=CHAMFER7_SIZE - 0.0001, length2=CHAMFER7_SIZE2 - 0.0001, reference=chamfer7_side[0])  # a hair under: the kernel refuses the full size


solid = part.part
